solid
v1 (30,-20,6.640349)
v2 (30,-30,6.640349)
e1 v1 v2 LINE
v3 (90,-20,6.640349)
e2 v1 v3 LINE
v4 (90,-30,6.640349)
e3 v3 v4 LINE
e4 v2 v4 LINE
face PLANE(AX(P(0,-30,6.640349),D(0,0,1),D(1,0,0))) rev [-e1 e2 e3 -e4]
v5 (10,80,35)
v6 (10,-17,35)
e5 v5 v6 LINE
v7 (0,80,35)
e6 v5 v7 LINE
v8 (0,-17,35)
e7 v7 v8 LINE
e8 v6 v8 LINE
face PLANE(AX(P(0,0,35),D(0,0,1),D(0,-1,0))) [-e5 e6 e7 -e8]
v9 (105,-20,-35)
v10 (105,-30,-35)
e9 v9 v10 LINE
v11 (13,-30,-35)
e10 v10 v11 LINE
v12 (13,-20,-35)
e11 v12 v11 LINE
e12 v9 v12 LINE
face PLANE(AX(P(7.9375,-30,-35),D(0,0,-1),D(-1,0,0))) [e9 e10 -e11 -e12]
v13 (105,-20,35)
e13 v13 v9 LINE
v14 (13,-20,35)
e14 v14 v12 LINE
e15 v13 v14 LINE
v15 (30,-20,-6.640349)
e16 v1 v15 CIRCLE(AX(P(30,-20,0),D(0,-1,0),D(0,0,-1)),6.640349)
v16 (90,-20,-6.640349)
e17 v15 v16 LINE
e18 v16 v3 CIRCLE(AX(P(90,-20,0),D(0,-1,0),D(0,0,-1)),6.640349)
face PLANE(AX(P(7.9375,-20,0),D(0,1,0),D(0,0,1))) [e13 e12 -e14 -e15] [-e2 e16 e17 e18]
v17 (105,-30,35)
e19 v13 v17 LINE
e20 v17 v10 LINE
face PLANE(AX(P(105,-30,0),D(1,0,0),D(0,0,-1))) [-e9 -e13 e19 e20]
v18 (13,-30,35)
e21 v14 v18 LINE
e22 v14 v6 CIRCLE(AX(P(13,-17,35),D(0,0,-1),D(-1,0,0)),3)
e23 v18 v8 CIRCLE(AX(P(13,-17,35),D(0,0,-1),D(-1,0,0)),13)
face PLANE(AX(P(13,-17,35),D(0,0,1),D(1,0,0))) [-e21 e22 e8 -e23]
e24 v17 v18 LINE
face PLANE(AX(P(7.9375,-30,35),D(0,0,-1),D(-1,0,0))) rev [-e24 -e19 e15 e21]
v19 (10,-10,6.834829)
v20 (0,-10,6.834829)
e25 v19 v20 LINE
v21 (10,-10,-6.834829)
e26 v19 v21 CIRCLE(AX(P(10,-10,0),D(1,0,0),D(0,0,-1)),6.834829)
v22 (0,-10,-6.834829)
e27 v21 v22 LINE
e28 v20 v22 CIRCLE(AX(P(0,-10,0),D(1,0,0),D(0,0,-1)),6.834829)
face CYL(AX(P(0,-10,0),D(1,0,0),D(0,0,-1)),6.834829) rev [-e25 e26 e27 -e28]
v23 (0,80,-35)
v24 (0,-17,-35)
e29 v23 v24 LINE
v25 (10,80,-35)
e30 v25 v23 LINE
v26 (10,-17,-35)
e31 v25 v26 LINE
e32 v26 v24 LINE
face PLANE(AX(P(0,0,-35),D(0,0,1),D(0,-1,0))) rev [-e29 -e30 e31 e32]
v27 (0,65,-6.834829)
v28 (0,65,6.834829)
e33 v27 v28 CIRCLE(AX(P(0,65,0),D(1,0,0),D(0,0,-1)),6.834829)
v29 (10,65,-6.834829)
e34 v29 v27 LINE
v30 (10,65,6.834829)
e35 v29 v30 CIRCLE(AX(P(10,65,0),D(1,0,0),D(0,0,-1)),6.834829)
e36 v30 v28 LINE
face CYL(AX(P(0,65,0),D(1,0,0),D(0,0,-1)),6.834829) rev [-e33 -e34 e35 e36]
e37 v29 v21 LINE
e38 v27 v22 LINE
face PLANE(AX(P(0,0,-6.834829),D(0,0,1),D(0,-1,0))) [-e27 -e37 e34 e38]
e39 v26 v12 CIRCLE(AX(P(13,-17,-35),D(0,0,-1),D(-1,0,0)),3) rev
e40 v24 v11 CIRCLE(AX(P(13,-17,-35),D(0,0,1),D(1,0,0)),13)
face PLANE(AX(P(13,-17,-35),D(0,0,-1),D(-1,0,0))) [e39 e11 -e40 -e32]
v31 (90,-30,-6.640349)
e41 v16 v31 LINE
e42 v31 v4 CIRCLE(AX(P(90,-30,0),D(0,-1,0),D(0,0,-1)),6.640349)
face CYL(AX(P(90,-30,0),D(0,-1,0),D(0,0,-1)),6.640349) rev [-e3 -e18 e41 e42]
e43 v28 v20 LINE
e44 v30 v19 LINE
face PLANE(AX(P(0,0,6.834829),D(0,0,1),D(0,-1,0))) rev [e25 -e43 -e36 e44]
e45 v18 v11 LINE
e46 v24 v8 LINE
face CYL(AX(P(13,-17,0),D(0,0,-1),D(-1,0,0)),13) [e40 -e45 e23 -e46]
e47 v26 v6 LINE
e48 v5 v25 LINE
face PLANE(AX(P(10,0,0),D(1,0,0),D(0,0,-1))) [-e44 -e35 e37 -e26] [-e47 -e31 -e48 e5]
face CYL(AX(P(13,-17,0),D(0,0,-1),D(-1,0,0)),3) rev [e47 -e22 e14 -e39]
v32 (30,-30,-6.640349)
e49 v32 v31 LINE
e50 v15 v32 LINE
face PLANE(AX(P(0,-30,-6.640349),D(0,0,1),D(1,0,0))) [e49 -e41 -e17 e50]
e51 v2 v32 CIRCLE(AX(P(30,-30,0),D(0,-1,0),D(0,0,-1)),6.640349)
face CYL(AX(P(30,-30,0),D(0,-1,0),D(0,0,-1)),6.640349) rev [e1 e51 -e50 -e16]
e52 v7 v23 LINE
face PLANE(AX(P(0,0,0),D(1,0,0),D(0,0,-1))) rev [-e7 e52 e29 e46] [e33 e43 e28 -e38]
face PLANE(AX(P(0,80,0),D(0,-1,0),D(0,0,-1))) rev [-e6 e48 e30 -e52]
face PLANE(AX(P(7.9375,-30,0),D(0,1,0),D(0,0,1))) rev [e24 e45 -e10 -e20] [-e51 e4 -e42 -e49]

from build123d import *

# Parameters (mm, degrees)
CROQUIS1_W                    = 70
CROQUIS1_H                    = 110
SALIENTE_EXTRUIR1_DEPTH       = 7.9375
CROQUIS2_W                    = 97.0625
CROQUIS2_H                    = 70
SALIENTE_EXTRUIR2_DEPTH       = 7.9375
CONVERTIR_S_LIDO1_START       = -22.0625
CONVERTIR_S_LIDO1_OUTLINE_W   = 97.0625
CONVERTIR_S_LIDO1_OUTLINE_H   = 70
CONVERTIR_S_LIDO1_DEPTH       = 5.0625
CONVERTIR_S_LIDO1_START_2     = -18.37306
CONVERTIR_S_LIDO1_2_OUTLINE_W = 2.0625
CONVERTIR_S_LIDO1_2_OUTLINE_H = 28.16517088
CONVERTIR_S_LIDO1_2_DEPTH     = 98.37306
CONVERTIR_S_LIDO1_START_3     = 65
CONVERTIR_S_LIDO1_3_OUTLINE_W = 2.0625
CONVERTIR_S_LIDO1_3_OUTLINE_H = 13.66965824
CONVERTIR_S_LIDO1_3_DEPTH     = 15
CONVERTIR_S_LIDO1_4_OUTLINE_W = 2.0625
CONVERTIR_S_LIDO1_4_OUTLINE_H = 13.66965824
CONVERTIR_S_LIDO1_4_DEPTH     = 8.37306
CONVERTIR_S_LIDO1_START_4     = 13
CONVERTIR_S_LIDO1_5_OUTLINE_W = 3
CONVERTIR_S_LIDO1_5_OUTLINE_H = 70
CONVERTIR_S_LIDO1_5_DEPTH     = 92
CONVERTIR_S_LIDO1_START_5     = 7.9375
CONVERTIR_S_LIDO1_6_DEPTH     = 2.0625
CONVERTIR_S_LIDO1_START_6     = -35
CONVERTIR_S_LIDO1_7_DEPTH     = 70


with BuildPart() as part:
    # Croquis1 → Saliente-Extruir1 (new body)
    with BuildSketch(Plane(origin=(0, 0, 0), x_dir=(0, 0, -1), z_dir=(1, 0, 0))):
        with Locations((0, 25)):
            Rectangle(CROQUIS1_W, CROQUIS1_H)
        with BuildLine():
            Line((6.83482912, 65), (6.83482912, -10))
            ThreePointArc((6.83482912, -10), (0, -16.83482912), (-6.83482912, -10))
            Line((-6.83482912, -10), (-6.83482912, 65))
            ThreePointArc((-6.83482912, 65), (0, 71.83482912), (6.83482912, 65))
        make_face(mode=Mode.SUBTRACT)
    extrude(amount=SALIENTE_EXTRUIR1_DEPTH)

    # Croquis2 → Saliente-Extruir2 (add)
    with BuildSketch(Plane.XZ.offset(30)):
        with Locations((56.46875, 0)):
            Rectangle(CROQUIS2_W, CROQUIS2_H)
        with BuildLine():
            ThreePointArc((30, -6.640349162), (23.359650838, 0), (30, 6.640349162))
            Line((30, 6.640349162), (90, 6.640349162))
            ThreePointArc((90, 6.640349162), (96.640349162, 0), (90, -6.640349162))
            Line((90, -6.640349162), (30, -6.640349162))
        make_face(mode=Mode.SUBTRACT)
    extrude(amount=-SALIENTE_EXTRUIR2_DEPTH)

    # Convertir-Sólido1: read off the stored shape, not the designer's step
    # Convertir-Sólido1 outline → Convertir-Sólido1 (add)
    with BuildSketch(Plane(origin=(0, 0, 0), x_dir=(1, 0, 0), z_dir=(0, 1, 0)).offset(CONVERTIR_S_LIDO1_START)):
        with Locations((56.46875, 0)):
            Rectangle(CONVERTIR_S_LIDO1_OUTLINE_W, CONVERTIR_S_LIDO1_OUTLINE_H)
        with BuildLine():
            Line((90, -6.640349162), (30, -6.640349162))
            ThreePointArc((30, -6.640349162), (23.359650838, 0), (30, 6.640349162))
            Line((30, 6.640349162), (90, 6.640349162))
            ThreePointArc((90, 6.640349162), (96.640349162, 0), (90, -6.640349162))
        make_face(mode=Mode.SUBTRACT)
    extrude(amount=CONVERTIR_S_LIDO1_DEPTH)

    # Convertir-S_lido1 2 outline → Convertir-S_lido1 2 (add)
    with BuildSketch(Plane(origin=(0, 0, 0), x_dir=(1, 0, 0), z_dir=(0, 1, 0)).offset(CONVERTIR_S_LIDO1_START_2)):
        with Locations((8.96875, 20.91741456)):
            Rectangle(CONVERTIR_S_LIDO1_2_OUTLINE_W, CONVERTIR_S_LIDO1_2_OUTLINE_H)
        with Locations((8.96875, -20.91741456)):
            Rectangle(CONVERTIR_S_LIDO1_2_OUTLINE_W, CONVERTIR_S_LIDO1_2_OUTLINE_H)
    extrude(amount=CONVERTIR_S_LIDO1_2_DEPTH)

    # Convertir-S_lido1 3 outline → Convertir-S_lido1 3 (add)
    with BuildSketch(Plane(origin=(0, 0, 0), x_dir=(1, 0, 0), z_dir=(0, 1, 0)).offset(CONVERTIR_S_LIDO1_START_3)):
        with Locations((8.96875, 0)):
            Rectangle(CONVERTIR_S_LIDO1_3_OUTLINE_W, CONVERTIR_S_LIDO1_3_OUTLINE_H)
    extrude(amount=CONVERTIR_S_LIDO1_3_DEPTH)

    # Convertir-S_lido1 4 outline → Convertir-S_lido1 4 (add)
    with BuildSketch(Plane(origin=(0, 0, 0), x_dir=(1, 0, 0), z_dir=(0, 1, 0)).offset(CONVERTIR_S_LIDO1_START_2)):
        with Locations((8.96875, 0)):
            Rectangle(CONVERTIR_S_LIDO1_4_OUTLINE_W, CONVERTIR_S_LIDO1_4_OUTLINE_H)
    extrude(amount=CONVERTIR_S_LIDO1_4_DEPTH)

    # Convertir-S_lido1 5 outline → Convertir-S_lido1 5 (cut)
    with BuildSketch(Plane.YZ.offset(CONVERTIR_S_LIDO1_START_4)):
        with Locations((-18.5, 0)):
            Rectangle(CONVERTIR_S_LIDO1_5_OUTLINE_W, CONVERTIR_S_LIDO1_5_OUTLINE_H)
    extrude(amount=CONVERTIR_S_LIDO1_5_DEPTH, mode=Mode.SUBTRACT)

    # Convertir-S_lido1 6 outline → Convertir-S_lido1 6 (cut)
    with BuildSketch(Plane.YZ.offset(CONVERTIR_S_LIDO1_START_5)):
        with BuildLine():
            Line((65, 6.83482912), (65, -6.83482912))
            ThreePointArc((65, -6.83482912), (71.83482912, 0), (65, 6.83482912))
        make_face()
        with BuildLine():
            Line((-10, -6.83482912), (-10, 6.83482912))
            ThreePointArc((-10, 6.83482912), (-16.83482912, 0), (-10, -6.83482912))
        make_face()
    extrude(amount=CONVERTIR_S_LIDO1_6_DEPTH, mode=Mode.SUBTRACT)

    # Convertir-S_lido1 7 outline → Convertir-S_lido1 7 (cut)
    with BuildSketch(Plane.XY.offset(CONVERTIR_S_LIDO1_START_6)):
        with BuildLine():
            Line((0, -30), (13, -30))
            ThreePointArc((13, -30), (3.807611845, -26.192388155), (0, -17))
            Line((0, -17), (0, -30))
        make_face()
        with BuildLine():
            ThreePointArc((10, -17), (10.878679656, -19.121320344), (13, -20))
            Line((13, -20), (13, -17))
            Line((13, -17), (10, -17))
        make_face()
    extrude(amount=CONVERTIR_S_LIDO1_7_DEPTH, mode=Mode.SUBTRACT)


solid = part.part
